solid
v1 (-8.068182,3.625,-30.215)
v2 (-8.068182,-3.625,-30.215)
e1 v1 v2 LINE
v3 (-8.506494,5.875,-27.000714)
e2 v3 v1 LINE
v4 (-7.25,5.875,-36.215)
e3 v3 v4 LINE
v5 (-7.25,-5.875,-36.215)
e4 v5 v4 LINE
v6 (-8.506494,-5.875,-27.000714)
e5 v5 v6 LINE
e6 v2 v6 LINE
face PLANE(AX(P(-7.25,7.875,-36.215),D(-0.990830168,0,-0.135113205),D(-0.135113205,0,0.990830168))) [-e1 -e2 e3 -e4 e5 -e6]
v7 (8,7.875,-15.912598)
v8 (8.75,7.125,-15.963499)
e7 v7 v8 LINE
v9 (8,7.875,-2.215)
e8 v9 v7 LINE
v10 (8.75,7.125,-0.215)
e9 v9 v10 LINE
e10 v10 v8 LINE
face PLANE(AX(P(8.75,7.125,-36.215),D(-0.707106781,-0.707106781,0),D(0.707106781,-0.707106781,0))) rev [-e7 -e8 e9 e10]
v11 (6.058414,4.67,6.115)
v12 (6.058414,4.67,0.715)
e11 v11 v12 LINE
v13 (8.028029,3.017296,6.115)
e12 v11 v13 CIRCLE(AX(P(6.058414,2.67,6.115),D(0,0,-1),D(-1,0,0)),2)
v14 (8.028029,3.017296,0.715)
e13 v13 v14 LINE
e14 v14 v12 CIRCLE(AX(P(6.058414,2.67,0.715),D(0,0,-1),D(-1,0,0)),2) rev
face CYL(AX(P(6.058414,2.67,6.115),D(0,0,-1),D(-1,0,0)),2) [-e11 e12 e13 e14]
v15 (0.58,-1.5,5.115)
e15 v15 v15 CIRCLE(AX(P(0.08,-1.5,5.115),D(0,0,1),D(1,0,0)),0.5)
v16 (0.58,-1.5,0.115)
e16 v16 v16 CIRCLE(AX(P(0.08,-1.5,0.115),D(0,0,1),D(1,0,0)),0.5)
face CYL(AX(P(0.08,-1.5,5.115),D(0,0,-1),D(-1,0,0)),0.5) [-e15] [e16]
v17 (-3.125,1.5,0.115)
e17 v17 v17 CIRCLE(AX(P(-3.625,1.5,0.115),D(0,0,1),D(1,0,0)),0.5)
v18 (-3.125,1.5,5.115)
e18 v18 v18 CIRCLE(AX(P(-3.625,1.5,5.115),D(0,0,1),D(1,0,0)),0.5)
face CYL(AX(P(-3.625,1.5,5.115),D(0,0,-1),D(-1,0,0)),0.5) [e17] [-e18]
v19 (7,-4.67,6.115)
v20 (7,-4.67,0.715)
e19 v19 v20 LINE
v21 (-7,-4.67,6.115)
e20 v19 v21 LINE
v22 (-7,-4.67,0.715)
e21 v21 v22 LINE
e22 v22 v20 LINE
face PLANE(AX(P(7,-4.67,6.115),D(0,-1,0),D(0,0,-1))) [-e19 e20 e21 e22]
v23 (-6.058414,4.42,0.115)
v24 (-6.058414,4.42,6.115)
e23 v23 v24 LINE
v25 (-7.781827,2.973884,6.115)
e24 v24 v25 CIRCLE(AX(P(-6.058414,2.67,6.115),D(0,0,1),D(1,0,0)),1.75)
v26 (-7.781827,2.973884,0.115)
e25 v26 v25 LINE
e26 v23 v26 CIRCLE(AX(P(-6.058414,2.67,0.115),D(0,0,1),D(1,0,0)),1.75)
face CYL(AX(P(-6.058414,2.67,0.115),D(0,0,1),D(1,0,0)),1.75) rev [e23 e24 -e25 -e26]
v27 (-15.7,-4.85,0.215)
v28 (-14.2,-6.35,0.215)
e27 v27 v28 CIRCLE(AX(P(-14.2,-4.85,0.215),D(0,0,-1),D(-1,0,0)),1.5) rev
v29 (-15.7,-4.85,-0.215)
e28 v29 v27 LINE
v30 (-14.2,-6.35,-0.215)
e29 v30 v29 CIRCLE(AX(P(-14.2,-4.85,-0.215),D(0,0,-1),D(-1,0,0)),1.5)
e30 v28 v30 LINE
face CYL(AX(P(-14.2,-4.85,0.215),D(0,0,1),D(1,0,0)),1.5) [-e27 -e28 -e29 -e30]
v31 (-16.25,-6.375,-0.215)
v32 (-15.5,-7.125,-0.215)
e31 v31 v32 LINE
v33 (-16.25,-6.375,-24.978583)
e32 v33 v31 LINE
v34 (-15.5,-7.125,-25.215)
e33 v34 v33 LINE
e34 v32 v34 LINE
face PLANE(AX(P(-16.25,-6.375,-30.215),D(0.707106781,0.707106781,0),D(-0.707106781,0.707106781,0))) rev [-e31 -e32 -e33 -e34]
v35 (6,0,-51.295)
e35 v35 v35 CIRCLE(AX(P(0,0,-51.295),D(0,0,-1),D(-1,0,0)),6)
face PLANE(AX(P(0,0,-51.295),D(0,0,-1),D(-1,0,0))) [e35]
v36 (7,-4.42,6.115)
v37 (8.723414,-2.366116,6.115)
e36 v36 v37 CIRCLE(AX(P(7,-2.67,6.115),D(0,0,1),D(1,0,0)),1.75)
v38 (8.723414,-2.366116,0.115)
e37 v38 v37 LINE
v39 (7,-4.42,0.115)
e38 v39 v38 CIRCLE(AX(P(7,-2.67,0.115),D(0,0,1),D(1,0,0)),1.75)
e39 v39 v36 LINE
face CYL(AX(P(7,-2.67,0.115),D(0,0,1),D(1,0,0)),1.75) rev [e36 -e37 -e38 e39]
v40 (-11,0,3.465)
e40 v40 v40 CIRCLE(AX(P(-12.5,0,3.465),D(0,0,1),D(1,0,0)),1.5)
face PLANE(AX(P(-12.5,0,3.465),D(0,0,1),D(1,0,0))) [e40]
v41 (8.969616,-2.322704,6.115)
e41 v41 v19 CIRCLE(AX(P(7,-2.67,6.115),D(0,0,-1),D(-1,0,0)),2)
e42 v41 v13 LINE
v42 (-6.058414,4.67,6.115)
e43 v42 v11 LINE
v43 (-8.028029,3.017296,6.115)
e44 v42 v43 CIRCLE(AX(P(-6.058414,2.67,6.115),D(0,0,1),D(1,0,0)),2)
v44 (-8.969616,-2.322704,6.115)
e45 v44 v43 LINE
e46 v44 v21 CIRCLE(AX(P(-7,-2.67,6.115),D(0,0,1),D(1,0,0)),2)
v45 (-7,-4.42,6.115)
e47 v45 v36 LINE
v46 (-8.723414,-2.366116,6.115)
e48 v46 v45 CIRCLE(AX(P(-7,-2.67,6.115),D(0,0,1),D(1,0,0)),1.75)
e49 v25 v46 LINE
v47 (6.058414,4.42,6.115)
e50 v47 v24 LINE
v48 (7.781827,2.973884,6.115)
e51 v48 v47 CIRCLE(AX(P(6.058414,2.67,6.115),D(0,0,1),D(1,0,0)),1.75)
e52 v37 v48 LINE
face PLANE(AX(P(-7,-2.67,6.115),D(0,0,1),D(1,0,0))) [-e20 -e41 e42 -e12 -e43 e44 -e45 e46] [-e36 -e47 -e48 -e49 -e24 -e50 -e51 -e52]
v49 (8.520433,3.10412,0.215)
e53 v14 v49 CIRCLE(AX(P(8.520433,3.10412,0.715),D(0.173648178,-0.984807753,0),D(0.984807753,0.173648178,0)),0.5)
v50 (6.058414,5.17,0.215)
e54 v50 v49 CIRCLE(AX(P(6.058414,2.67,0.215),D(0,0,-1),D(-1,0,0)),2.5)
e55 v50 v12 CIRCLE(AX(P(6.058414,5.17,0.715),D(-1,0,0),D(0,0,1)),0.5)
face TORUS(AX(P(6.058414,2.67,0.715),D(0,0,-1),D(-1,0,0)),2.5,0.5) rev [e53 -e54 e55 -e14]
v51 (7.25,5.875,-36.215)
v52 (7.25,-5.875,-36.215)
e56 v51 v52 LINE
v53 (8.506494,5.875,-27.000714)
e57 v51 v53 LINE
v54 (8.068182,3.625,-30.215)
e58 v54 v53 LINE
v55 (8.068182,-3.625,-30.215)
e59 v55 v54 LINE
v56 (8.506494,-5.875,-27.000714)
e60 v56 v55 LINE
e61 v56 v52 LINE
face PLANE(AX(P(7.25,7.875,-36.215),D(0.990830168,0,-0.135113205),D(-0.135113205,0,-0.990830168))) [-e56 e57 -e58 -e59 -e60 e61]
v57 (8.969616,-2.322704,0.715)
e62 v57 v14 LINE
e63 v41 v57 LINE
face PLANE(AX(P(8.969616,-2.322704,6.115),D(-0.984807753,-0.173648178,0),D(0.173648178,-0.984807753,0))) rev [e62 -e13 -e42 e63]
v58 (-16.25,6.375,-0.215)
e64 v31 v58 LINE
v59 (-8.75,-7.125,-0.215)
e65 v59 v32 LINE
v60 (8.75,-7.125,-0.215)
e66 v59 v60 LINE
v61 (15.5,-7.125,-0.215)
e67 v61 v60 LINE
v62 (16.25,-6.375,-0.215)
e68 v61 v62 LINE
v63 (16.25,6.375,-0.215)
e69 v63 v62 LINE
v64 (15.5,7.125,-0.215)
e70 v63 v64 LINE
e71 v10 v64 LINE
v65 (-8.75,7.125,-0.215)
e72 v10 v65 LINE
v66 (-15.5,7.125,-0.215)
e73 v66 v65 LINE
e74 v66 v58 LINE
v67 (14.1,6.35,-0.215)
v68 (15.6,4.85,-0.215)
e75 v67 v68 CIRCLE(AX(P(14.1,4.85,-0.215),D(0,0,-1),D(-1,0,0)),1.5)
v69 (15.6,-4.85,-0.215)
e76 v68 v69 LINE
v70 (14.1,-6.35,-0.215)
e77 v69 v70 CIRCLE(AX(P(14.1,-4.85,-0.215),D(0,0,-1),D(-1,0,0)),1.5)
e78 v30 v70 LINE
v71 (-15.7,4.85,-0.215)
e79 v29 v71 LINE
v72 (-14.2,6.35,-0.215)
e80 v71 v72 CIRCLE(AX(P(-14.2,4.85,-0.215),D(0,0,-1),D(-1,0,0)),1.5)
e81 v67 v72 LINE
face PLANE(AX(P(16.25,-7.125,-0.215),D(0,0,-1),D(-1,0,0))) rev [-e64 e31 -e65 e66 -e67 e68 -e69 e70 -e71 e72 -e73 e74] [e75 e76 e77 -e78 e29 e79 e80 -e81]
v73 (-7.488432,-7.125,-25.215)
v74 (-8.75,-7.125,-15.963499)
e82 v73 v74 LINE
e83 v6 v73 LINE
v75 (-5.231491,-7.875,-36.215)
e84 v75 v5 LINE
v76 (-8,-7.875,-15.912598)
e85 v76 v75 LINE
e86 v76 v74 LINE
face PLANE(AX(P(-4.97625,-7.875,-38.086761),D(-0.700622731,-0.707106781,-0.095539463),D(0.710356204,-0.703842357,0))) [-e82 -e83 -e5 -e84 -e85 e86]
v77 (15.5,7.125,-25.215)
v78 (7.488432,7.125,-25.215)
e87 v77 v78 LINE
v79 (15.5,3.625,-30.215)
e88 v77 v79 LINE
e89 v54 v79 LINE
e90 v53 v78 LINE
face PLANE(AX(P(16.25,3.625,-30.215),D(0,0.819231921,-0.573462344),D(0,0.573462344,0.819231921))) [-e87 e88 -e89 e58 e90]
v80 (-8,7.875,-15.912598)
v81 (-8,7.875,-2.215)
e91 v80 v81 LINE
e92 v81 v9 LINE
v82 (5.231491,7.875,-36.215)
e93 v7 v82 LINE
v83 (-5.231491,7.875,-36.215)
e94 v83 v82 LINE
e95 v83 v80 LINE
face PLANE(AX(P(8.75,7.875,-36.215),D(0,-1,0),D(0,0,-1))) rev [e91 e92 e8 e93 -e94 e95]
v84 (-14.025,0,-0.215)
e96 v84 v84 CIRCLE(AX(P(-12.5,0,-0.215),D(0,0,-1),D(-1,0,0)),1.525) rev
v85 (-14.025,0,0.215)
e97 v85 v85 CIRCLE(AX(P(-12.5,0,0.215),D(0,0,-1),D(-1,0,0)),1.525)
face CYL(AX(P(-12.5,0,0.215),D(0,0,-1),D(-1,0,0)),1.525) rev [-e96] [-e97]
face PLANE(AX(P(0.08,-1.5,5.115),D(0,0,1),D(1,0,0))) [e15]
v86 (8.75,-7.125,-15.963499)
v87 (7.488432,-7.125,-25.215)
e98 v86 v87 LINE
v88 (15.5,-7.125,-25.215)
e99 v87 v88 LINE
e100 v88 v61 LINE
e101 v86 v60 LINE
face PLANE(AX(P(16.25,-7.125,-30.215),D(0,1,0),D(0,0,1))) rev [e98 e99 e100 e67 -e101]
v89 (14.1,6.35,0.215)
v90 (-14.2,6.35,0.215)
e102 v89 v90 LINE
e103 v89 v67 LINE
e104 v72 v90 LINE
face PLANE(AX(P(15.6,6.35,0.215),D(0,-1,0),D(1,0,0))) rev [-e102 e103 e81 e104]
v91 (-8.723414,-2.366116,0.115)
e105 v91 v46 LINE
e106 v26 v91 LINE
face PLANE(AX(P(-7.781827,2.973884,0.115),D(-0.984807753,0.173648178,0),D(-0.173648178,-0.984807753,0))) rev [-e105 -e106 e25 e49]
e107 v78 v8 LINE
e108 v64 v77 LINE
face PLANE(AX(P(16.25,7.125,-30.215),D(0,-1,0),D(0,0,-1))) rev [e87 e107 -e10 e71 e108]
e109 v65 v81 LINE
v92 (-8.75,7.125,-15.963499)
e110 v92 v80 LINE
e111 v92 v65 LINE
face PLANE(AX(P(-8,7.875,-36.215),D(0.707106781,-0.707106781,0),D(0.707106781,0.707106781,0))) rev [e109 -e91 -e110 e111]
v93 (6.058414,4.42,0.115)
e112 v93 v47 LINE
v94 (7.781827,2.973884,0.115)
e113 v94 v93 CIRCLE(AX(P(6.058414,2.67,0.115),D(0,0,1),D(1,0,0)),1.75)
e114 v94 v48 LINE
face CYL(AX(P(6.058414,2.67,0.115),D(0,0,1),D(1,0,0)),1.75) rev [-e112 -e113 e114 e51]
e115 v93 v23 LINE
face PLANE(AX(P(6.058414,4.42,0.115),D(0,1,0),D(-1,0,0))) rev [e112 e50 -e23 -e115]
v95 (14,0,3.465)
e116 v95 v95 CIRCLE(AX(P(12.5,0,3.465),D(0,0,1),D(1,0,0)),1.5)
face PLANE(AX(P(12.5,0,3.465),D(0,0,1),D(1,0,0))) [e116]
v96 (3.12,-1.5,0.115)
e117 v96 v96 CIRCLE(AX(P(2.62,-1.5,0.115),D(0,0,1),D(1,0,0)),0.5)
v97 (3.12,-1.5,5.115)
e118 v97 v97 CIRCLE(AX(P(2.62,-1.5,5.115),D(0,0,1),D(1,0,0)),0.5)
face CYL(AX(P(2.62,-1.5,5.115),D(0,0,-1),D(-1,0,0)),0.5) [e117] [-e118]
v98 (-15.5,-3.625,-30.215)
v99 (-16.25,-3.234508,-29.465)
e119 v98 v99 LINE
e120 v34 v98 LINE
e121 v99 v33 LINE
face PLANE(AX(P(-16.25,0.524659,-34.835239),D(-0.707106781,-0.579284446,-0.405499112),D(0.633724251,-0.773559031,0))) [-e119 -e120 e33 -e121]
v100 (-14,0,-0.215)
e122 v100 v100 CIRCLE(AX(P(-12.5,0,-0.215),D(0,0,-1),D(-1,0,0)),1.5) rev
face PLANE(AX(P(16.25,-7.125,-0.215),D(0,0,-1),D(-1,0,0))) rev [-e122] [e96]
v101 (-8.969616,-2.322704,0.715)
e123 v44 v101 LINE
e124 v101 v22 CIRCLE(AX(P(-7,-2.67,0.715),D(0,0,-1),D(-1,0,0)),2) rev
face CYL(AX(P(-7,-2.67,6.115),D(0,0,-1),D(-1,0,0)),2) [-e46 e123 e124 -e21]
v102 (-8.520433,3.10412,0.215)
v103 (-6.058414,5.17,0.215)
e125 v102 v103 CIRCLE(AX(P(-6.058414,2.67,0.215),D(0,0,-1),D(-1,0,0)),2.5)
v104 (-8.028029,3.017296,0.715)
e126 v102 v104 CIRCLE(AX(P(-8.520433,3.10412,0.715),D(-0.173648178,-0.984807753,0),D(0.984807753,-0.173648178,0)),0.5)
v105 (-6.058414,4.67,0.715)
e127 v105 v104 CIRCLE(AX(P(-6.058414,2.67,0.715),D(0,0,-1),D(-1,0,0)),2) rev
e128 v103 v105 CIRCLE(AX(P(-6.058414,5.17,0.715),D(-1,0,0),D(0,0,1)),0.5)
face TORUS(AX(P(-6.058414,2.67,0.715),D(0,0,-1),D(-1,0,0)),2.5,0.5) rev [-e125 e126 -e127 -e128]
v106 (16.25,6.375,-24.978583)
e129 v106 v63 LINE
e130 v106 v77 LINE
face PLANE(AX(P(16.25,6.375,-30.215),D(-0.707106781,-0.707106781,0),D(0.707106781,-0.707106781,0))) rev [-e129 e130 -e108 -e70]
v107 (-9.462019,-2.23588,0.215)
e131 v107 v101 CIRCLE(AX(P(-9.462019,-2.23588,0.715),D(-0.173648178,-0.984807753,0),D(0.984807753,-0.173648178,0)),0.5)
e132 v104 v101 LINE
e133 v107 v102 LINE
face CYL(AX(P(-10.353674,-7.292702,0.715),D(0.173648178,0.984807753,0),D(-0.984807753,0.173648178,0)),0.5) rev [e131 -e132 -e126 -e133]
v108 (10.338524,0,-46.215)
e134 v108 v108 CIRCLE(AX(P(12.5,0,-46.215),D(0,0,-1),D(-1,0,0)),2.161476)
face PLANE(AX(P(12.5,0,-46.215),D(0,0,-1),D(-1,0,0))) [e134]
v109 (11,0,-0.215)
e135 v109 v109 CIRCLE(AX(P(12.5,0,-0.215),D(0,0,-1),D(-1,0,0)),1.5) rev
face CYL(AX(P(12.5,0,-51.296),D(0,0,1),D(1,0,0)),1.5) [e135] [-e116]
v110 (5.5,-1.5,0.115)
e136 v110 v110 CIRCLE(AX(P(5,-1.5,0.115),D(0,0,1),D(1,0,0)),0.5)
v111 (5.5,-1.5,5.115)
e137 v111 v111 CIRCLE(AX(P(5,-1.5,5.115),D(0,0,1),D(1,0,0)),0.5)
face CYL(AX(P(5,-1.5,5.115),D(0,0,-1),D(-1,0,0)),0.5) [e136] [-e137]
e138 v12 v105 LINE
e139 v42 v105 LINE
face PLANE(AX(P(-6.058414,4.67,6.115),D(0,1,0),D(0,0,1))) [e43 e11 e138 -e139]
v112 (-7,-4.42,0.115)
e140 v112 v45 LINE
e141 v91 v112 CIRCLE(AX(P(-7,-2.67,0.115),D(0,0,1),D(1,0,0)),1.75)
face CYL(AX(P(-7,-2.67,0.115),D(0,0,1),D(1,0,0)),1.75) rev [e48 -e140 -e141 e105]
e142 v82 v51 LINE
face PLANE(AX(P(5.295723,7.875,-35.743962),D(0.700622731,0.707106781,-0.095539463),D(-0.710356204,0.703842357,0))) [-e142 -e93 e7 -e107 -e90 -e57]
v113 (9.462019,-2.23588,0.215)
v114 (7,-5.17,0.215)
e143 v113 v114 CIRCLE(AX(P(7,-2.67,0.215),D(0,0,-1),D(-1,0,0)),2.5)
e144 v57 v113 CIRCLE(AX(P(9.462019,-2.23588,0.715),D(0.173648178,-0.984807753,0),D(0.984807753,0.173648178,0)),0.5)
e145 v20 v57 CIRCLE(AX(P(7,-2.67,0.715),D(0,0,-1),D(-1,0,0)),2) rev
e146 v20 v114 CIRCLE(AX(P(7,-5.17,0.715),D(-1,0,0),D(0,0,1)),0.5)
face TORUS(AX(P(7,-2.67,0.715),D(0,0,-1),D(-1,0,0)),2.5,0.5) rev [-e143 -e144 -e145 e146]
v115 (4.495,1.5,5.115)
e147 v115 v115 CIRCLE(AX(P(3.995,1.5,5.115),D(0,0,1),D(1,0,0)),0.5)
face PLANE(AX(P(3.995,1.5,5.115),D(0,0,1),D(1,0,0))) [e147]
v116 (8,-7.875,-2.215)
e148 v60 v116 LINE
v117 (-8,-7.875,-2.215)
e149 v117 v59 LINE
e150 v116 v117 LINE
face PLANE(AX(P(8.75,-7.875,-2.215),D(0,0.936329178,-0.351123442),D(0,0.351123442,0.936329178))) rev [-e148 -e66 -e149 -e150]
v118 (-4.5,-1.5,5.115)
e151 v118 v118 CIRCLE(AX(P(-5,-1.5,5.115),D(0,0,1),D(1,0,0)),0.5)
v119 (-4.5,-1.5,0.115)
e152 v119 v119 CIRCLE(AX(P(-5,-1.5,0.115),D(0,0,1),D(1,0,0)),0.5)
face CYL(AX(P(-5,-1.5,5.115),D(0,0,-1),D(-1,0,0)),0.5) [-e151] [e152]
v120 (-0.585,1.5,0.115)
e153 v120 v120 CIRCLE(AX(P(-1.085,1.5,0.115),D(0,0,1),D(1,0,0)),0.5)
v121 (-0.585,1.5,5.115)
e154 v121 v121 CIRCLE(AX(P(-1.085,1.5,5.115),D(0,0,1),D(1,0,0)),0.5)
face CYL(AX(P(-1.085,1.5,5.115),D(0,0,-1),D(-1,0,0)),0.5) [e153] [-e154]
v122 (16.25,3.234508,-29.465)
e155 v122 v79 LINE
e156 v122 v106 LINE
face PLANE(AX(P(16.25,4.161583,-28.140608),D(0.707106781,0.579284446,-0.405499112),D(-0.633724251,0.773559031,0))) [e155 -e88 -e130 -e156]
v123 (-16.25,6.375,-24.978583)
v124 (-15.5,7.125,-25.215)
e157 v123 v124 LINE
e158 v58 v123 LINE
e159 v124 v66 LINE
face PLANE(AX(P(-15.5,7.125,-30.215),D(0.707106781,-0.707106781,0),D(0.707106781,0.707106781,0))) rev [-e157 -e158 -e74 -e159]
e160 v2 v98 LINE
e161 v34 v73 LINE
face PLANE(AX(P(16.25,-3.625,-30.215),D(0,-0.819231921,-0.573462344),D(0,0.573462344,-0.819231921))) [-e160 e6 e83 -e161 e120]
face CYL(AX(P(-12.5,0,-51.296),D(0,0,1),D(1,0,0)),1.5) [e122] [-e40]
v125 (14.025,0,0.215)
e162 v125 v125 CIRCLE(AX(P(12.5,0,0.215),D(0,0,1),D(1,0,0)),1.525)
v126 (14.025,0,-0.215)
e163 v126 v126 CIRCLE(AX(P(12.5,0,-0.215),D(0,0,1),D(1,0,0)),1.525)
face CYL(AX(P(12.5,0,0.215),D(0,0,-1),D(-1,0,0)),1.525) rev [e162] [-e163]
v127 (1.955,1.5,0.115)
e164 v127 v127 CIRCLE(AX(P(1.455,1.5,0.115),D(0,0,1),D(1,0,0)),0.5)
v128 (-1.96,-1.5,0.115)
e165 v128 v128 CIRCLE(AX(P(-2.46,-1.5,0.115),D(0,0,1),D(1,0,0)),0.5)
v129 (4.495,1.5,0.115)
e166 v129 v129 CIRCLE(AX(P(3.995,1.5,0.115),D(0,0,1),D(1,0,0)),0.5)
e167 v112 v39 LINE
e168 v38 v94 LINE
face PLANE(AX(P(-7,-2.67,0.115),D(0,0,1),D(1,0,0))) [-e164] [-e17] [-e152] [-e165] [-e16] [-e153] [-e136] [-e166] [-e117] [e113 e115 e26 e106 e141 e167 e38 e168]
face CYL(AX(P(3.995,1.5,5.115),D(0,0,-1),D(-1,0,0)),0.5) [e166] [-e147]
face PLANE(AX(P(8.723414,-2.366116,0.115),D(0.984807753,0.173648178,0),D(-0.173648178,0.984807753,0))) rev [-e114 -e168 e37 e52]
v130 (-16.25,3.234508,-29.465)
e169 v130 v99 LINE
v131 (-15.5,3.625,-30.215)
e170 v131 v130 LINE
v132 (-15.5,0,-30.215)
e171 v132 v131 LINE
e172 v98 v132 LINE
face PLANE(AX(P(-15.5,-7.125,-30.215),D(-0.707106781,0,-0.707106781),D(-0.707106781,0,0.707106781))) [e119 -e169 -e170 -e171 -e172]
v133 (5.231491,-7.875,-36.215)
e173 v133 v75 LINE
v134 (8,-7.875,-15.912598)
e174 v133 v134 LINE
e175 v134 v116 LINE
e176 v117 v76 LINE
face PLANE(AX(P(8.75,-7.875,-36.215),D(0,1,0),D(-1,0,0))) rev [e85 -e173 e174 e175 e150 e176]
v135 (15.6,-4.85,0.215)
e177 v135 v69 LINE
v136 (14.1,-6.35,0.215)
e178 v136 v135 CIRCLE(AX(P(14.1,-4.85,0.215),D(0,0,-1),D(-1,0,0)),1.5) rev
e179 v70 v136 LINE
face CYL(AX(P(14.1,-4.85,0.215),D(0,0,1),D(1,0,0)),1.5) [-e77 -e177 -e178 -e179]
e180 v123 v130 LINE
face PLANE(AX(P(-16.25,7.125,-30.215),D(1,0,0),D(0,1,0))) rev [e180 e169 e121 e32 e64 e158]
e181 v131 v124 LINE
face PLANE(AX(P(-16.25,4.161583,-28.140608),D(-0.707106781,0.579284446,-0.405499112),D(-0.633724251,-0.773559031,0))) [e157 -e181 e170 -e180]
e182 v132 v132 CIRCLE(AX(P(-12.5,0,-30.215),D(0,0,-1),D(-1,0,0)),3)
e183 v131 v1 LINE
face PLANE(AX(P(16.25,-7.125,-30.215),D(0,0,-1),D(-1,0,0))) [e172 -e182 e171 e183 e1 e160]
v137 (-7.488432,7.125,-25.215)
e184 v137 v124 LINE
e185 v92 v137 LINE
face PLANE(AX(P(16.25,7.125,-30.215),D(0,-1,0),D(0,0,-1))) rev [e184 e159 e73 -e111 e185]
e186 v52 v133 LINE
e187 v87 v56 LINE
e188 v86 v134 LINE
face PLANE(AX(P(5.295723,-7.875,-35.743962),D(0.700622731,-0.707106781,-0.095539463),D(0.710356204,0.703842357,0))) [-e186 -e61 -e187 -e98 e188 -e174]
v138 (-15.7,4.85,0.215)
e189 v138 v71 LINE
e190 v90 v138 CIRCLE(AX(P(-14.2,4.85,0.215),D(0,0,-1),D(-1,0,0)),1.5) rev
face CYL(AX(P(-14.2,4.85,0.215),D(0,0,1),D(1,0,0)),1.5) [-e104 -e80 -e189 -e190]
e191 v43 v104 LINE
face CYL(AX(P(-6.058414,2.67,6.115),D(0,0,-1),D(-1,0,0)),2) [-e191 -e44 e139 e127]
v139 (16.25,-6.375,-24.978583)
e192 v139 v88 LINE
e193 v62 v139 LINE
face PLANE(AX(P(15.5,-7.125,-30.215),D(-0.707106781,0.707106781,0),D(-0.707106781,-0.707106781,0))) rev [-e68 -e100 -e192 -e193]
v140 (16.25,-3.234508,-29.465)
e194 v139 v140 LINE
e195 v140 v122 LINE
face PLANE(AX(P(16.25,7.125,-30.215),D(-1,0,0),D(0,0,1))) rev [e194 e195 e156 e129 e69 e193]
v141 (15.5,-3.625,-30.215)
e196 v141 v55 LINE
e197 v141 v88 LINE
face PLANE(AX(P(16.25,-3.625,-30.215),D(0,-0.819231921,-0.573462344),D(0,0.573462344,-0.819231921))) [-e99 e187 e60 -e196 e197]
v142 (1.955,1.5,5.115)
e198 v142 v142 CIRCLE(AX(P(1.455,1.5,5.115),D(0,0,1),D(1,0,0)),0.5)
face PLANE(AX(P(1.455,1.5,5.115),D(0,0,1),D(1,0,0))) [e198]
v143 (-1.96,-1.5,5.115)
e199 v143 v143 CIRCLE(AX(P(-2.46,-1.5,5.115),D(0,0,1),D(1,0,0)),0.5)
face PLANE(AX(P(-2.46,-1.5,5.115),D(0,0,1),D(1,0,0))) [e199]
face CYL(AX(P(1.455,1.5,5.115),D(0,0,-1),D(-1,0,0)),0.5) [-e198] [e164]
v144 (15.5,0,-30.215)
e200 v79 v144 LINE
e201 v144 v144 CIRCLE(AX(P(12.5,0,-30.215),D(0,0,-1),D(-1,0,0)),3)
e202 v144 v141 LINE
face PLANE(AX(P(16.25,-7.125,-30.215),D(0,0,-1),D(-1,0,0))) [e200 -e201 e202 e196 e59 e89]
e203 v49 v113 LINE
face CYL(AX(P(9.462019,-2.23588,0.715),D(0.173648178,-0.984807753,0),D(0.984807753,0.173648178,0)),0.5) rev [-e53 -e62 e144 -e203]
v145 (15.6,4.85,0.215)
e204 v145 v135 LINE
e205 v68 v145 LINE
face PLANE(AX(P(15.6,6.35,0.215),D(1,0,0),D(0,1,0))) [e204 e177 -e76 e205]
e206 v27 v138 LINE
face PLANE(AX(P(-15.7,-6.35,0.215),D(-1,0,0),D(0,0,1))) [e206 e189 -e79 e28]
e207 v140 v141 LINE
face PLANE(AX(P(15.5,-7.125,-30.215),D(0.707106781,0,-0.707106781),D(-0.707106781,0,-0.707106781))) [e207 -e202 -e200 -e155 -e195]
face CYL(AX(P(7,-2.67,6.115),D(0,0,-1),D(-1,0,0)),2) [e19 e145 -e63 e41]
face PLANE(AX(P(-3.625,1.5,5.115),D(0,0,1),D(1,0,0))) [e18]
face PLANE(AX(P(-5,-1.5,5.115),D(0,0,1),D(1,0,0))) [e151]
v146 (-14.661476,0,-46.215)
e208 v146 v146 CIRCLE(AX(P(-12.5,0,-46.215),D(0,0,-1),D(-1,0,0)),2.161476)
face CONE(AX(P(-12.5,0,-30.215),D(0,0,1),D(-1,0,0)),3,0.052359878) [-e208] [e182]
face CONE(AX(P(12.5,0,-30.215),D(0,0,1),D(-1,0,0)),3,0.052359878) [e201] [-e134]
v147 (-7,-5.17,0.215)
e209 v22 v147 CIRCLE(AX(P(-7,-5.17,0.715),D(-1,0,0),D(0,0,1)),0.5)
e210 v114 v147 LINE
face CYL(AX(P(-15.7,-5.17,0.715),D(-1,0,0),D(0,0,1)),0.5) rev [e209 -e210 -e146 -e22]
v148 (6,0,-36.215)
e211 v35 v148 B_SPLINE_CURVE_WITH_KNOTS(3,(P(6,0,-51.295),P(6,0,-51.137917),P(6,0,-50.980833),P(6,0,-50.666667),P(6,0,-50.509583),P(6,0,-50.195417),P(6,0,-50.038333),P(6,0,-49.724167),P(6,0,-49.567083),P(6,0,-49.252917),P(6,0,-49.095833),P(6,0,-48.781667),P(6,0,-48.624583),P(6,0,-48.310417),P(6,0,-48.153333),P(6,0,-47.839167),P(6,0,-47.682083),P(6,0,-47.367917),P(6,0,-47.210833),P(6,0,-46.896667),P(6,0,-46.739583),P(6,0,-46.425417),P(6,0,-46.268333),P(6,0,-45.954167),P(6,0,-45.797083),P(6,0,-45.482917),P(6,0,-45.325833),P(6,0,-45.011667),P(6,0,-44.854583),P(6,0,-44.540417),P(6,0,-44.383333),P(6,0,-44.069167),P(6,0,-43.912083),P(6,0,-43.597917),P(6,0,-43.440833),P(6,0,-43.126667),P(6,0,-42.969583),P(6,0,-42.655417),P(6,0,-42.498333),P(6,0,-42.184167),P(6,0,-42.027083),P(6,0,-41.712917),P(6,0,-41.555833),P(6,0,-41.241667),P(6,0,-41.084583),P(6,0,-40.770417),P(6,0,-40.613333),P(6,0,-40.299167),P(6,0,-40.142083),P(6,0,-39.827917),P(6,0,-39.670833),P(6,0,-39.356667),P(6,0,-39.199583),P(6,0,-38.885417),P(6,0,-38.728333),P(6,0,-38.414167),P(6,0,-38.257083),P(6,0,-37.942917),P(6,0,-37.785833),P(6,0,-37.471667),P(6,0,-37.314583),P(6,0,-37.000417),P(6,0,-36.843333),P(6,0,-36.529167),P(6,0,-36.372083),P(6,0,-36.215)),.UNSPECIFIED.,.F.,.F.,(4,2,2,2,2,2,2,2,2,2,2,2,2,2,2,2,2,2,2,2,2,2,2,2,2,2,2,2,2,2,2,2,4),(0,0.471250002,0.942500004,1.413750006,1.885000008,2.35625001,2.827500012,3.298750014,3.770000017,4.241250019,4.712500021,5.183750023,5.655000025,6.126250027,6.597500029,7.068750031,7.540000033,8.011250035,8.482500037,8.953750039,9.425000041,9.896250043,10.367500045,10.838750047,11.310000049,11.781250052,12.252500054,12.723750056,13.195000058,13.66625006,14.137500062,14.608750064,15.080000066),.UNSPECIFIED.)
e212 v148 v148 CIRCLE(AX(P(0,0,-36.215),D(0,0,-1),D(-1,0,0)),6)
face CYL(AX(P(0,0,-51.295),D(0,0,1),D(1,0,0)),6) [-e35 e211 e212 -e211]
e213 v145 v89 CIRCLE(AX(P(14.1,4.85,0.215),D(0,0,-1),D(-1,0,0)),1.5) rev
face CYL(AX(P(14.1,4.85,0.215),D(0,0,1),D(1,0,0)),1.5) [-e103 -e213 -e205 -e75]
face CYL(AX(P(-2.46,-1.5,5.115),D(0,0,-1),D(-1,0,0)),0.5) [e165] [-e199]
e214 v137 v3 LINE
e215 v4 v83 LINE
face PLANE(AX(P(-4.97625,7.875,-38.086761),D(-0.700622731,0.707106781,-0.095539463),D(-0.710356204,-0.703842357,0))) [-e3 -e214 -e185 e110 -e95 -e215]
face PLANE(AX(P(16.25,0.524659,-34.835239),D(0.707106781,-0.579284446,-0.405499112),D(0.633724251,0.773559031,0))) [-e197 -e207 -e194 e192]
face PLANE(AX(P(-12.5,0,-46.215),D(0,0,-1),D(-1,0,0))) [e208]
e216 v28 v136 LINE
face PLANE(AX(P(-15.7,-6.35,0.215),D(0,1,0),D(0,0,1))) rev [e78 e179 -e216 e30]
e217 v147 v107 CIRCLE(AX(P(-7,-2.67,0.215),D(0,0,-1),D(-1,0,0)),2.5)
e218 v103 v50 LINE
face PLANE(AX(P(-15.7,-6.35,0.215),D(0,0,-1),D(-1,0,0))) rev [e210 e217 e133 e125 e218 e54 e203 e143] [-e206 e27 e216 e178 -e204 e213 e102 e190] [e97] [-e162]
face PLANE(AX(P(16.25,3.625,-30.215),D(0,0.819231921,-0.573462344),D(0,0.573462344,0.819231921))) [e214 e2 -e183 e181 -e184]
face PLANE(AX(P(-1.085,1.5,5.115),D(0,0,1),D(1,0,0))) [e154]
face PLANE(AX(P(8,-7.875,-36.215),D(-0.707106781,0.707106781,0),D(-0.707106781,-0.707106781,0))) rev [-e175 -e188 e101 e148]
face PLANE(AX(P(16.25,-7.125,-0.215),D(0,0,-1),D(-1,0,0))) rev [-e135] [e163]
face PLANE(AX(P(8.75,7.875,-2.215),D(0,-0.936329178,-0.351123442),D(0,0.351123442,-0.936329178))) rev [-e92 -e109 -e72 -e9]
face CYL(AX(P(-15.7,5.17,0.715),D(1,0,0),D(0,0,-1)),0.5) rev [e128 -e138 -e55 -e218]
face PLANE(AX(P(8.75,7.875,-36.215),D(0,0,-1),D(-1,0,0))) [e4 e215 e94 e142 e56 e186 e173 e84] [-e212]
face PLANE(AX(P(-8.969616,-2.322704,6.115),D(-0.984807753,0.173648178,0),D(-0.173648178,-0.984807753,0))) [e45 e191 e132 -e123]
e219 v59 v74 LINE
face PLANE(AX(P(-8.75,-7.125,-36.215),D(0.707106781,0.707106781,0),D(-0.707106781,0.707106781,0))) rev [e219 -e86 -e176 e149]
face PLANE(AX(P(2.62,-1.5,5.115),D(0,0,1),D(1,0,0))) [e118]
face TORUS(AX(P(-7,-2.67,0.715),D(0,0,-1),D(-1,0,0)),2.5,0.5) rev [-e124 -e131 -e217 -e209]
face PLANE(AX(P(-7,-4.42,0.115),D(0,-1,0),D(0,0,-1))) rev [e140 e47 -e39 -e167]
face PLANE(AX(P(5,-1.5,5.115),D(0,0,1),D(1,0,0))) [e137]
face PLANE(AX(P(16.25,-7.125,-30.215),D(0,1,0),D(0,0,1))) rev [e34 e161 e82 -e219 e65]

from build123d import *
from OCP.BRepFilletAPI import BRepFilletAPI_MakeChamfer

# Parameters (mm, degrees)
SKETCH1_W                        = 31.3
SKETCH1_H                        = 12.7
SKETCH1_R                        = 1.525
BASE_EXTRUDE_DEPTH               = 0.215
FILLET6_R                        = 1.5
BOSS_EXTRUDE2_DEPTH              = 5.9
FILLET8_R                        = 0.5
CUT_EXTRUDE1_DEPTH               = 6
SKETCH8_R                        = 0.5
BOSS_EXTRUDE3_DEPTH              = 5
LPATTERN1_COUNT                  = 4
LPATTERN1_PITCH                  = 2.54
SKETCH9_W                        = 32.5
SKETCH9_H                        = 14.25
BOSS_EXTRUDE4_DEPTH              = 30
SKETCH11_R                       = 2
CUT_EXTRUDE3_DEPTH               = 20
BOSS_EXTRUDE6_DEPTH              = 6
BOSS_EXTRUDE6_DEPTH_BACK         = 30
SKETCH12_W                       = 17.5
SKETCH12_H                       = 15.75
CHAMFER1_SIZE                    = 5
CHAMFER1_SIZE2                   = 3.5
CHAMFER3_SIZE                    = 11
CHAMFER3_SIZE_2                  = 1.5
CHAMFER4_SIZE                    = 2
CHAMFER6_SIZE                    = 0.75
CHAMFER7_SIZE                    = 0.75
CHAMFER7_SIZE2                   = 2
SKETCH18_R                       = 6
BOSS_EXTRUDE8_DEPTH              = 15.080000066
SKETCH20_R                       = 0.5
BOSS_EXTRUDE10_DEPTH             = 5
SKETCH22_R                       = 2
BOSS_EXTRUDE12_DEPTH             = 2
BOSS_EXTRUDE12_DIRECTION_2_REACH = 42.57
SKETCH21_R                       = 1.5
BOSS_EXTRUDE14_DEPTH             = 3.25
BOSS_EXTRUDE14_DIRECTION_2_REACH = 56.583
SKETCH23_R                       = 3
BOSS_EXTRUDE15_DEPTH             = 16
BOSS_EXTRUDE15_DRAFT             = 3
BOSS_EXTRUDE15_PROFILE_2_DEPTH   = 16
BOSS_EXTRUDE15_PROFILE_2_DRAFT   = 3


# Some blends are built 0.0001 mm under size
with BuildPart() as part:
    # Sketch1 → Base-Extrude (new, symmetric)
    with BuildSketch(Plane.XY):
        with Locations((-0.05, 0)):
            Rectangle(SKETCH1_W, SKETCH1_H)
        with Locations((12.5, 0)):
            Circle(SKETCH1_R, mode=Mode.SUBTRACT)
        with Locations(Location((-12.5, 0, 0), (0, 0, 180))):
            Circle(SKETCH1_R, mode=Mode.SUBTRACT)
    extrude(amount=BASE_EXTRUDE_DEPTH, both=True)

    # Fillet6
    fillet6_edges = [part.edges().sort_by_distance(p)[0] for p in [
        (-15.7, -6.35, 0),
        (15.6, -6.35, 0),
        (15.6, 6.35, 0),
        (-15.7, 6.35, 0),
    ]]
    fillet(fillet6_edges, radius=FILLET6_R)

    # Sketch4 → Boss-Extrude2 (add)
    with BuildSketch(Plane.XY.offset(0.215)):
        with BuildLine():
            Line((7, -4.67), (-7, -4.67))
            ThreePointArc((-7, -4.67), (-8.532088886, -3.955575219), (-8.969615506, -2.322703645))
            Line((-8.969615506, -2.322703645), (-8.028029429, 3.017296355))
            ThreePointArc((-8.028029429, 3.017296355), (-7.343989142, 4.202088886), (-6.058413923, 4.67))
            Line((-6.058413923, 4.67), (6.058413923, 4.67))
            ThreePointArc((6.058413923, 4.67), (7.343989142, 4.202088886), (8.028029429, 3.017296355))
            Line((8.028029429, 3.017296355), (8.969615506, -2.322703645))
            ThreePointArc((8.969615506, -2.322703645), (8.532088886, -3.955575219), (7, -4.67))
        make_face()
    extrude(amount=BOSS_EXTRUDE2_DEPTH)

    # Fillet8
    fillet8_edges = [part.edges().sort_by_distance(p)[0] for p in [
        (-8.532088886, -3.955575219, 0.215),
        (8.498822468, 0.347296355, 0.215),
        (-7.343989142, 4.202088886, 0.215),
        (-8.498822468, 0.347296355, 0.215),
        (0, 4.67, 0.215),
        (7.343989142, 4.202088886, 0.215),
        (8.532088886, -3.955575219, 0.215),
        (0, -4.67, 0.215),
    ]]
    fillet(fillet8_edges, radius=FILLET8_R)

    # Sketch5 → Cut-Extrude1 (cut)
    with BuildSketch(Plane.XY.offset(6.115)):
        with BuildLine():
            Line((-7, -4.42), (7, -4.42))
            ThreePointArc((7, -4.42), (8.340577775, -3.794878317), (8.723413568, -2.366115689))
            Line((8.723413568, -2.366115689), (7.781827491, 2.973884311))
            ThreePointArc((7.781827491, 2.973884311), (7.18329224, 4.010577775), (6.058413923, 4.42))
            Line((6.058413923, 4.42), (-6.058413923, 4.42))
            ThreePointArc((-6.058413923, 4.42), (-7.18329224, 4.010577775), (-7.781827491, 2.973884311))
            Line((-7.781827491, 2.973884311), (-8.723413568, -2.366115689))
            ThreePointArc((-8.723413568, -2.366115689), (-8.340577775, -3.794878317), (-7, -4.42))
        make_face()
    extrude(amount=-CUT_EXTRUDE1_DEPTH, mode=Mode.SUBTRACT)

    # Sketch8 → Boss-Extrude3 (add)
    with BuildSketch(Plane.XY.offset(0.115)):
        with Locations((-5, -1.5)):
            Circle(SKETCH8_R)
        with Locations((-3.625, 1.5)):
            Circle(SKETCH8_R)
    boss_extrude3 = extrude(amount=BOSS_EXTRUDE3_DEPTH)

    # LPattern1: Boss-Extrude3 ×4
    with Locations(*[(i * LPATTERN1_PITCH, 0, 0) for i in range(1, LPATTERN1_COUNT)]):
        add(boss_extrude3)

    # Sketch9 → Boss-Extrude4 (add)
    with BuildSketch(Plane(origin=(0, 0, -0.215), x_dir=(-1, 0, 0), z_dir=(0, 0, -1))):
        Rectangle(SKETCH9_W, SKETCH9_H)
    extrude(amount=BOSS_EXTRUDE4_DEPTH)

    # Sketch11 → Cut-Extrude3 (cut)
    with BuildSketch(Plane(origin=(0, 0, -30.215), x_dir=(-1, 0, 0), z_dir=(0, 0, -1))):
        with Locations((-12.5, 0)):
            Circle(SKETCH11_R)
        with Locations((12.5, 0)):
            Circle(SKETCH11_R)
    extrude(amount=-CUT_EXTRUDE3_DEPTH, mode=Mode.SUBTRACT)

    # Sketch12 → Boss-Extrude6 (add, two sides: drawn at the far end of the back side and taken through both)
    with BuildSketch(Plane(origin=(0, 0, -30.215), x_dir=(-1, 0, 0), z_dir=(0, 0, -1)).offset(-BOSS_EXTRUDE6_DEPTH_BACK)):
        Rectangle(SKETCH12_W, SKETCH12_H)
    extrude(amount=BOSS_EXTRUDE6_DEPTH + BOSS_EXTRUDE6_DEPTH_BACK)

    # Chamfer1: one chamfer whose edges measure the first distance from different faces: ONE call of the kernel's chamfer builder (chamfer() names one face for all edges)
    chamfer1_edges_1 = [part.edges().sort_by_distance(p)[0] for p in [
        (12.5, -7.125, -30.215),
    ]]
    chamfer1_side_1 = [part.faces().sort_by_distance(p)[0] for p in [
        (12.5, -7.125, -15.215),
    ]]
    chamfer1_edges_2 = [part.edges().sort_by_distance(p)[0] for p in [
        (-12.5, 7.125, -30.215),
    ]]
    chamfer1_side_2 = [part.faces().sort_by_distance(p)[0] for p in [
        (-12.5, 7.125, -15.215),
    ]]
    chamfer1_edges_3 = [part.edges().sort_by_distance(p)[0] for p in [
        (-12.5, -7.125, -30.215),
    ]]
    chamfer1_side_3 = [part.faces().sort_by_distance(p)[0] for p in [
        (-12.5, -7.125, -15.215),
    ]]
    chamfer1_edges_4 = [part.edges().sort_by_distance(p)[0] for p in [
        (12.5, 7.125, -30.215),
    ]]
    chamfer1_side_4 = [part.faces().sort_by_distance(p)[0] for p in [
        (12.5, 7.125, -15.215),
    ]]
    chamfer1 = BRepFilletAPI_MakeChamfer(part.part.solid().wrapped)
    for e in chamfer1_edges_1:
        chamfer1.Add(CHAMFER1_SIZE, CHAMFER1_SIZE2, e.wrapped, chamfer1_side_1[0].wrapped)  # the first distance lies on this face
    for e in chamfer1_edges_2:
        chamfer1.Add(CHAMFER1_SIZE, CHAMFER1_SIZE2, e.wrapped, chamfer1_side_2[0].wrapped)  # the first distance lies on this face
    for e in chamfer1_edges_3:
        chamfer1.Add(CHAMFER1_SIZE, CHAMFER1_SIZE2, e.wrapped, chamfer1_side_3[0].wrapped)  # the first distance lies on this face
    for e in chamfer1_edges_4:
        chamfer1.Add(CHAMFER1_SIZE, CHAMFER1_SIZE2, e.wrapped, chamfer1_side_4[0].wrapped)  # the first distance lies on this face
    add(Compound.cast(chamfer1.Shape()), mode=Mode.REPLACE)

    # Chamfer3
    # the kernel refuses this chamfer: 11, 1.5 mm, written as the material it takes off along each edge
    with BuildSketch(Plane(origin=(8.75, -36.465299494, -36.215), x_dir=(0, 0, 1), z_dir=(0, 1, 0))) as chamfer3_piece_1_section:
        Polygon((CHAMFER3_SIZE, 0), (0, -CHAMFER3_SIZE_2), (0, 0), align=None)
    chamfer3_piece_1 = extrude(amount=72.930598988, mode=Mode.PRIVATE)
    chamfer3_piece_1 = split(chamfer3_piece_1, bisect_by=Plane(origin=(8.75, -11.606038089, -18.813517016), z_dir=(0, -0.8192319205190406, -0.5734623443633283)), keep=Keep.TOP, mode=Mode.PRIVATE)
    add(chamfer3_piece_1, mode=Mode.SUBTRACT)
    with BuildSketch(Plane(origin=(8.75, -36.465299494, -36.215), x_dir=(0, 0, 1), z_dir=(0, 1, 0))) as chamfer3_piece_2_section:
        Polygon((CHAMFER3_SIZE, 0), (0, -CHAMFER3_SIZE_2), (0, 0), align=None)
    chamfer3_piece_2 = extrude(amount=72.930598988, mode=Mode.PRIVATE)
    chamfer3_piece_2 = split(chamfer3_piece_2, bisect_by=Plane(origin=(8.75, -36.465299494, -30.215), z_dir=(0, 0, -1)), keep=Keep.TOP, mode=Mode.PRIVATE)
    add(chamfer3_piece_2, mode=Mode.SUBTRACT)
    with BuildSketch(Plane(origin=(8.75, -36.465299494, -36.215), x_dir=(0, 0, 1), z_dir=(0, 1, 0))) as chamfer3_piece_3_section:
        Polygon((CHAMFER3_SIZE, 0), (0, -CHAMFER3_SIZE_2), (0, 0), align=None)
    chamfer3_piece_3 = extrude(amount=72.930598988, mode=Mode.PRIVATE)
    chamfer3_piece_3 = split(chamfer3_piece_3, bisect_by=Plane(origin=(8.75, -12.377850169, -53.076214527), z_dir=(0, 0.8192319205190406, -0.5734623443633283)), keep=Keep.TOP, mode=Mode.PRIVATE)
    add(chamfer3_piece_3, mode=Mode.SUBTRACT)
    with BuildSketch(Plane(origin=(-8.75, 36.465299494, -36.215), x_dir=(1, 0, 0), z_dir=(0, -1, 0))) as chamfer3_piece_4_section:
        Polygon((CHAMFER3_SIZE_2, 0), (0, CHAMFER3_SIZE), (0, 0), align=None)
    chamfer3_piece_4 = extrude(amount=72.930598988, mode=Mode.PRIVATE)
    chamfer3_piece_4 = split(chamfer3_piece_4, bisect_by=Plane(origin=(-8.75, 36.465299494, -30.215), z_dir=(0, 0, -1)), keep=Keep.TOP, mode=Mode.PRIVATE)
    add(chamfer3_piece_4, mode=Mode.SUBTRACT)
    with BuildSketch(Plane(origin=(-8.75, 36.465299494, -36.215), x_dir=(1, 0, 0), z_dir=(0, -1, 0))) as chamfer3_piece_5_section:
        Polygon((CHAMFER3_SIZE_2, 0), (0, CHAMFER3_SIZE), (0, 0), align=None)
    chamfer3_piece_5 = extrude(amount=72.930598988, mode=Mode.PRIVATE)
    chamfer3_piece_5 = split(chamfer3_piece_5, bisect_by=Plane(origin=(-8.75, 11.606038089, -18.813517016), z_dir=(0, 0.8192319205190406, -0.5734623443633283)), keep=Keep.TOP, mode=Mode.PRIVATE)
    add(chamfer3_piece_5, mode=Mode.SUBTRACT)
    with BuildSketch(Plane(origin=(-8.75, 36.465299494, -36.215), x_dir=(1, 0, 0), z_dir=(0, -1, 0))) as chamfer3_piece_6_section:
        Polygon((CHAMFER3_SIZE_2, 0), (0, CHAMFER3_SIZE), (0, 0), align=None)
    chamfer3_piece_6 = extrude(amount=72.930598988, mode=Mode.PRIVATE)
    chamfer3_piece_6 = split(chamfer3_piece_6, bisect_by=Plane(origin=(-8.75, 12.377850169, -53.076214527), z_dir=(0, -0.8192319205190406, -0.5734623443633283)), keep=Keep.TOP, mode=Mode.PRIVATE)
    add(chamfer3_piece_6, mode=Mode.SUBTRACT)

    # Chamfer4
    # the kernel refuses this chamfer: 2 mm, written as the material it takes off along each edge
    with BuildSketch(Plane(origin=(10.83480998, 7.875, -9.926393477), x_dir=(0, -1, 0), z_dir=(-0.1351132047333135, 0, -0.990830168044299))) as chamfer4_piece_1_section:
        Polygon((CHAMFER4_SIZE, 0), (0, CHAMFER4_SIZE), (0, 0), align=None)
    chamfer4_piece_1 = extrude(amount=31.675265559, mode=Mode.PRIVATE)
    chamfer4_piece_1 = split(chamfer4_piece_1, bisect_by=Plane(origin=(10.83480998, 7.125, -9.926393477), z_dir=(0, 1, 0)), keep=Keep.TOP, mode=Mode.PRIVATE)
    add(chamfer4_piece_1, mode=Mode.SUBTRACT)
    with BuildSketch(Plane(origin=(10.83480998, 7.875, -9.926393477), x_dir=(0, -1, 0), z_dir=(-0.1351132047333135, 0, -0.990830168044299))) as chamfer4_piece_2_section:
        Polygon((CHAMFER4_SIZE, 0), (0, CHAMFER4_SIZE), (0, 0), align=None)
    chamfer4_piece_2 = extrude(amount=31.675265559, mode=Mode.PRIVATE)
    chamfer4_piece_2 = split(chamfer4_piece_2, bisect_by=Plane(origin=(10.83480998, 14.554211118, -14.60184126), z_dir=(0, 0.8192319205190406, -0.5734623443633283)), keep=Keep.TOP, mode=Mode.PRIVATE)
    add(chamfer4_piece_2, mode=Mode.SUBTRACT)
    with BuildSketch(Plane(origin=(-6.55506334, 7.875, -41.311202174), x_dir=(0, -1, 0), z_dir=(-0.13511320473331356, 0, 0.9908301680442989))) as chamfer4_piece_3_section:
        Polygon((CHAMFER4_SIZE, 0), (0, CHAMFER4_SIZE), (0, 0), align=None)
    chamfer4_piece_3 = extrude(amount=31.675265559, mode=Mode.PRIVATE)
    chamfer4_piece_3 = split(chamfer4_piece_3, bisect_by=Plane(origin=(-6.55506334, -0.190329881, -35.665471258), z_dir=(0, 0.8192319205190406, -0.5734623443633283)), keep=Keep.TOP, mode=Mode.PRIVATE)
    add(chamfer4_piece_3, mode=Mode.SUBTRACT)
    with BuildSketch(Plane(origin=(-6.55506334, 7.875, -41.311202174), x_dir=(0, -1, 0), z_dir=(-0.13511320473331356, 0, 0.9908301680442989))) as chamfer4_piece_4_section:
        Polygon((CHAMFER4_SIZE, 0), (0, CHAMFER4_SIZE), (0, 0), align=None)
    chamfer4_piece_4 = extrude(amount=31.675265559, mode=Mode.PRIVATE)
    chamfer4_piece_4 = split(chamfer4_piece_4, bisect_by=Plane(origin=(-6.55506334, 7.125, -41.311202174), z_dir=(0, 1, 0)), keep=Keep.TOP, mode=Mode.PRIVATE)
    add(chamfer4_piece_4, mode=Mode.SUBTRACT)
    with BuildSketch(Plane(origin=(6.55506334, -7.875, -41.311202174), x_dir=(0, 1, 0), z_dir=(0.13511320473331356, 0, 0.9908301680442989))) as chamfer4_piece_5_section:
        Polygon((CHAMFER4_SIZE, 0), (0, CHAMFER4_SIZE), (0, 0), align=None)
    chamfer4_piece_5 = extrude(amount=31.675265559, mode=Mode.PRIVATE)
    chamfer4_piece_5 = split(chamfer4_piece_5, bisect_by=Plane(origin=(6.55506334, 0.190329881, -35.665471258), z_dir=(0, -0.8192319205191814, -0.573462344363127)), keep=Keep.TOP, mode=Mode.PRIVATE)
    add(chamfer4_piece_5, mode=Mode.SUBTRACT)
    with BuildSketch(Plane(origin=(6.55506334, -7.875, -41.311202174), x_dir=(0, 1, 0), z_dir=(0.13511320473331356, 0, 0.9908301680442989))) as chamfer4_piece_6_section:
        Polygon((CHAMFER4_SIZE, 0), (0, CHAMFER4_SIZE), (0, 0), align=None)
    chamfer4_piece_6 = extrude(amount=31.675265559, mode=Mode.PRIVATE)
    chamfer4_piece_6 = split(chamfer4_piece_6, bisect_by=Plane(origin=(6.55506334, -7.125, -41.311202174), z_dir=(0, -1, 0)), keep=Keep.TOP, mode=Mode.PRIVATE)
    add(chamfer4_piece_6, mode=Mode.SUBTRACT)
    with BuildSketch(Plane(origin=(-10.83480998, -7.875, -9.926393477), x_dir=(0.990830168044299, 0, 0.1351132047333135), z_dir=(0.1351132047333135, 0, -0.990830168044299))) as chamfer4_piece_7_section:
        Polygon((CHAMFER4_SIZE, 0), (0, -CHAMFER4_SIZE), (0, 0), align=None)
    chamfer4_piece_7 = extrude(amount=31.675265559, mode=Mode.PRIVATE)
    chamfer4_piece_7 = split(chamfer4_piece_7, bisect_by=Plane(origin=(-10.83480998, -7.125, -9.926393477), z_dir=(0, -1, 0)), keep=Keep.TOP, mode=Mode.PRIVATE)
    add(chamfer4_piece_7, mode=Mode.SUBTRACT)
    with BuildSketch(Plane(origin=(-10.83480998, -7.875, -9.926393477), x_dir=(0.990830168044299, 0, 0.1351132047333135), z_dir=(0.1351132047333135, 0, -0.990830168044299))) as chamfer4_piece_8_section:
        Polygon((CHAMFER4_SIZE, 0), (0, -CHAMFER4_SIZE), (0, 0), align=None)
    chamfer4_piece_8 = extrude(amount=31.675265559, mode=Mode.PRIVATE)
    chamfer4_piece_8 = split(chamfer4_piece_8, bisect_by=Plane(origin=(-10.83480998, -14.554211118, -14.60184126), z_dir=(0, -0.8192319205190406, -0.5734623443633283)), keep=Keep.TOP, mode=Mode.PRIVATE)
    add(chamfer4_piece_8, mode=Mode.SUBTRACT)

    # Chamfer6
    chamfer6_edges = [part.edges().sort_by_distance(p)[0] for p in [
        (-16.25, 0, -30.215),
        (-16.25, 7.125, -12.715),
        (-16.25, -7.125, -12.715),
        (-16.25, -5.375, -27.715),
        (-16.25, 5.375, -27.715),
        (16.25, 0, -30.215),
        (16.25, -7.125, -12.715),
        (16.25, 7.125, -12.715),
        (16.25, -5.375, -27.715),
        (16.25, 5.375, -27.715),
        (-8.75, 7.875, -5.313798896),
        (8.75, 7.875, -5.313798896),
        (-8.75, -7.875, -5.313798896),
        (8.75, -7.875, -5.313798896),
    ]]
    chamfer(chamfer6_edges, length=CHAMFER6_SIZE - 0.0001)  # a hair under: the kernel refuses the full size

    # Chamfer7
    chamfer7_edges = [part.edges().sort_by_distance(p)[0] for p in [
        (0, 7.875, -0.215),
        (0, -7.875, -0.215),
    ]]
    chamfer7_side = [part.faces().sort_by_distance(p)[0] for p in [
        (15.888847331, 0, -0.215),
    ]]
    chamfer(chamfer7_edges, length=CHAMFER7_SIZE, length2=CHAMFER7_SIZE2, reference=chamfer7_side[0])

    # Sketch18 → Boss-Extrude8 (add)
    with BuildSketch(Plane(origin=(0, 0, -36.215), x_dir=(-1, 0, 0), z_dir=(0, 0, -1))):
        with Locations(Location((0, 0, 0), (0, 0, 180))):
            Circle(SKETCH18_R)
    extrude(amount=BOSS_EXTRUDE8_DEPTH)

    # Sketch20 → Boss-Extrude10 (add)
    with BuildSketch(Plane.XY.offset(0.115)):
        with Locations((5, -1.5)):
            Circle(SKETCH20_R)
    extrude(amount=BOSS_EXTRUDE10_DEPTH)

    # Sketch22 → Boss-Extrude12 (add)
    with BuildSketch(Plane(origin=(0, 0, -30.215), x_dir=(-1, 0, 0), z_dir=(0, 0, -1))):
        with Locations((12.5, 0)):
            Circle(SKETCH22_R)
        with Locations((-12.5, 0)):
            Circle(SKETCH22_R)
    extrude(amount=BOSS_EXTRUDE12_DEPTH)

    # Sketch22 → Boss-Extrude12 direction 2 (add, up to next)
    with BuildSketch(Plane(origin=(0, 0, -30.215), x_dir=(-1, 0, 0), z_dir=(0, 0, -1)), mode=Mode.PRIVATE) as boss_extrude12_direction_2_sk1:
        with Locations((12.5, 0)):
            Circle(SKETCH22_R)
    boss_extrude12_direction_2_tool1 = extrude(boss_extrude12_direction_2_sk1.sketch, amount=-BOSS_EXTRUDE12_DIRECTION_2_REACH, mode=Mode.PRIVATE) - part.part
    # Sketch22 → Boss-Extrude12 direction 2 (add, up to next)
    with BuildSketch(Plane(origin=(0, 0, -30.215), x_dir=(-1, 0, 0), z_dir=(0, 0, -1)), mode=Mode.PRIVATE) as boss_extrude12_direction_2_sk2:
        with Locations((-12.5, 0)):
            Circle(SKETCH22_R)
    boss_extrude12_direction_2_tool2 = extrude(boss_extrude12_direction_2_sk2.sketch, amount=-BOSS_EXTRUDE12_DIRECTION_2_REACH, mode=Mode.PRIVATE) - part.part
    add(boss_extrude12_direction_2_tool1.solids().sort_by_distance((-12.5, 0, -30.215))[0])
    add(boss_extrude12_direction_2_tool2.solids().sort_by_distance((12.5, 0, -30.215))[0])

    # Sketch21 → Boss-Extrude14 (add)
    with BuildSketch(Plane.XY.offset(0.215)):
        with Locations((-12.5, 0)):
            Circle(SKETCH21_R)
        with Locations((12.5, 0)):
            Circle(SKETCH21_R)
    extrude(amount=BOSS_EXTRUDE14_DEPTH)

    # Sketch21 → Boss-Extrude14 direction 2 (add, up to next)
    with BuildSketch(Plane.XY.offset(0.215), mode=Mode.PRIVATE) as boss_extrude14_direction_2_sk1:
        with Locations((-12.5, 0)):
            Circle(SKETCH21_R)
    boss_extrude14_direction_2_tool1 = extrude(boss_extrude14_direction_2_sk1.sketch, amount=-BOSS_EXTRUDE14_DIRECTION_2_REACH, mode=Mode.PRIVATE) - part.part
    # Sketch21 → Boss-Extrude14 direction 2 (add, up to next)
    with BuildSketch(Plane.XY.offset(0.215), mode=Mode.PRIVATE) as boss_extrude14_direction_2_sk2:
        with Locations((12.5, 0)):
            Circle(SKETCH21_R)
    boss_extrude14_direction_2_tool2 = extrude(boss_extrude14_direction_2_sk2.sketch, amount=-BOSS_EXTRUDE14_DIRECTION_2_REACH, mode=Mode.PRIVATE) - part.part
    add(boss_extrude14_direction_2_tool1.solids().sort_by_distance((-12.5, 0, 0.215))[0])
    add(boss_extrude14_direction_2_tool2.solids().sort_by_distance((12.5, 0, 0.215))[0])


with BuildPart() as boss_extrude15_tool:
    # Sketch23 → Boss-Extrude15 (with draft: the straight prism first)
    with BuildSketch(Plane(origin=(0, 0, -30.215), x_dir=(-1, 0, 0), z_dir=(0, 0, -1))):
        with Locations((12.5, 0)):
            Circle(SKETCH23_R)
    extrude(amount=BOSS_EXTRUDE15_DEPTH)
    # Boss-Extrude15: the draft: its side faces are tilted about the plane it starts from
    boss_extrude15_sides = [boss_extrude15_tool.faces().sort_by_distance(p)[0] for p in [
        (-9.5, 0, -38.215),
    ]]
    draft(boss_extrude15_sides, Plane(origin=(0, 0, -30.215), x_dir=(-1, 0, 0), z_dir=(0, 0, -1)), BOSS_EXTRUDE15_DRAFT)


with BuildPart() as part_1:
    add(part.part)

    # Boss-Extrude15: add boss_extrude15_tool
    add(boss_extrude15_tool.part)


with BuildPart() as boss_extrude15_profile_2_tool:
    # Sketch23 → Boss-Extrude15 profile 2 (with draft: the straight prism first)
    with BuildSketch(Plane(origin=(0, 0, -30.215), x_dir=(-1, 0, 0), z_dir=(0, 0, -1))):
        with Locations((-12.5, 0)):
            Circle(SKETCH23_R)
    extrude(amount=BOSS_EXTRUDE15_PROFILE_2_DEPTH)
    # Boss-Extrude15 profile 2: the draft: its side faces are tilted about the plane it starts from
    boss_extrude15_profile_2_sides = [boss_extrude15_profile_2_tool.faces().sort_by_distance(p)[0] for p in [
        (15.5, 0, -38.215),
    ]]
    draft(boss_extrude15_profile_2_sides, Plane(origin=(0, 0, -30.215), x_dir=(-1, 0, 0), z_dir=(0, 0, -1)), BOSS_EXTRUDE15_PROFILE_2_DRAFT)


with BuildPart() as part_2:
    add(part_1.part)

    # Boss-Extrude15 profile 2: add boss_extrude15_profile_2_tool
    add(boss_extrude15_profile_2_tool.part)


solid = part_2.part
